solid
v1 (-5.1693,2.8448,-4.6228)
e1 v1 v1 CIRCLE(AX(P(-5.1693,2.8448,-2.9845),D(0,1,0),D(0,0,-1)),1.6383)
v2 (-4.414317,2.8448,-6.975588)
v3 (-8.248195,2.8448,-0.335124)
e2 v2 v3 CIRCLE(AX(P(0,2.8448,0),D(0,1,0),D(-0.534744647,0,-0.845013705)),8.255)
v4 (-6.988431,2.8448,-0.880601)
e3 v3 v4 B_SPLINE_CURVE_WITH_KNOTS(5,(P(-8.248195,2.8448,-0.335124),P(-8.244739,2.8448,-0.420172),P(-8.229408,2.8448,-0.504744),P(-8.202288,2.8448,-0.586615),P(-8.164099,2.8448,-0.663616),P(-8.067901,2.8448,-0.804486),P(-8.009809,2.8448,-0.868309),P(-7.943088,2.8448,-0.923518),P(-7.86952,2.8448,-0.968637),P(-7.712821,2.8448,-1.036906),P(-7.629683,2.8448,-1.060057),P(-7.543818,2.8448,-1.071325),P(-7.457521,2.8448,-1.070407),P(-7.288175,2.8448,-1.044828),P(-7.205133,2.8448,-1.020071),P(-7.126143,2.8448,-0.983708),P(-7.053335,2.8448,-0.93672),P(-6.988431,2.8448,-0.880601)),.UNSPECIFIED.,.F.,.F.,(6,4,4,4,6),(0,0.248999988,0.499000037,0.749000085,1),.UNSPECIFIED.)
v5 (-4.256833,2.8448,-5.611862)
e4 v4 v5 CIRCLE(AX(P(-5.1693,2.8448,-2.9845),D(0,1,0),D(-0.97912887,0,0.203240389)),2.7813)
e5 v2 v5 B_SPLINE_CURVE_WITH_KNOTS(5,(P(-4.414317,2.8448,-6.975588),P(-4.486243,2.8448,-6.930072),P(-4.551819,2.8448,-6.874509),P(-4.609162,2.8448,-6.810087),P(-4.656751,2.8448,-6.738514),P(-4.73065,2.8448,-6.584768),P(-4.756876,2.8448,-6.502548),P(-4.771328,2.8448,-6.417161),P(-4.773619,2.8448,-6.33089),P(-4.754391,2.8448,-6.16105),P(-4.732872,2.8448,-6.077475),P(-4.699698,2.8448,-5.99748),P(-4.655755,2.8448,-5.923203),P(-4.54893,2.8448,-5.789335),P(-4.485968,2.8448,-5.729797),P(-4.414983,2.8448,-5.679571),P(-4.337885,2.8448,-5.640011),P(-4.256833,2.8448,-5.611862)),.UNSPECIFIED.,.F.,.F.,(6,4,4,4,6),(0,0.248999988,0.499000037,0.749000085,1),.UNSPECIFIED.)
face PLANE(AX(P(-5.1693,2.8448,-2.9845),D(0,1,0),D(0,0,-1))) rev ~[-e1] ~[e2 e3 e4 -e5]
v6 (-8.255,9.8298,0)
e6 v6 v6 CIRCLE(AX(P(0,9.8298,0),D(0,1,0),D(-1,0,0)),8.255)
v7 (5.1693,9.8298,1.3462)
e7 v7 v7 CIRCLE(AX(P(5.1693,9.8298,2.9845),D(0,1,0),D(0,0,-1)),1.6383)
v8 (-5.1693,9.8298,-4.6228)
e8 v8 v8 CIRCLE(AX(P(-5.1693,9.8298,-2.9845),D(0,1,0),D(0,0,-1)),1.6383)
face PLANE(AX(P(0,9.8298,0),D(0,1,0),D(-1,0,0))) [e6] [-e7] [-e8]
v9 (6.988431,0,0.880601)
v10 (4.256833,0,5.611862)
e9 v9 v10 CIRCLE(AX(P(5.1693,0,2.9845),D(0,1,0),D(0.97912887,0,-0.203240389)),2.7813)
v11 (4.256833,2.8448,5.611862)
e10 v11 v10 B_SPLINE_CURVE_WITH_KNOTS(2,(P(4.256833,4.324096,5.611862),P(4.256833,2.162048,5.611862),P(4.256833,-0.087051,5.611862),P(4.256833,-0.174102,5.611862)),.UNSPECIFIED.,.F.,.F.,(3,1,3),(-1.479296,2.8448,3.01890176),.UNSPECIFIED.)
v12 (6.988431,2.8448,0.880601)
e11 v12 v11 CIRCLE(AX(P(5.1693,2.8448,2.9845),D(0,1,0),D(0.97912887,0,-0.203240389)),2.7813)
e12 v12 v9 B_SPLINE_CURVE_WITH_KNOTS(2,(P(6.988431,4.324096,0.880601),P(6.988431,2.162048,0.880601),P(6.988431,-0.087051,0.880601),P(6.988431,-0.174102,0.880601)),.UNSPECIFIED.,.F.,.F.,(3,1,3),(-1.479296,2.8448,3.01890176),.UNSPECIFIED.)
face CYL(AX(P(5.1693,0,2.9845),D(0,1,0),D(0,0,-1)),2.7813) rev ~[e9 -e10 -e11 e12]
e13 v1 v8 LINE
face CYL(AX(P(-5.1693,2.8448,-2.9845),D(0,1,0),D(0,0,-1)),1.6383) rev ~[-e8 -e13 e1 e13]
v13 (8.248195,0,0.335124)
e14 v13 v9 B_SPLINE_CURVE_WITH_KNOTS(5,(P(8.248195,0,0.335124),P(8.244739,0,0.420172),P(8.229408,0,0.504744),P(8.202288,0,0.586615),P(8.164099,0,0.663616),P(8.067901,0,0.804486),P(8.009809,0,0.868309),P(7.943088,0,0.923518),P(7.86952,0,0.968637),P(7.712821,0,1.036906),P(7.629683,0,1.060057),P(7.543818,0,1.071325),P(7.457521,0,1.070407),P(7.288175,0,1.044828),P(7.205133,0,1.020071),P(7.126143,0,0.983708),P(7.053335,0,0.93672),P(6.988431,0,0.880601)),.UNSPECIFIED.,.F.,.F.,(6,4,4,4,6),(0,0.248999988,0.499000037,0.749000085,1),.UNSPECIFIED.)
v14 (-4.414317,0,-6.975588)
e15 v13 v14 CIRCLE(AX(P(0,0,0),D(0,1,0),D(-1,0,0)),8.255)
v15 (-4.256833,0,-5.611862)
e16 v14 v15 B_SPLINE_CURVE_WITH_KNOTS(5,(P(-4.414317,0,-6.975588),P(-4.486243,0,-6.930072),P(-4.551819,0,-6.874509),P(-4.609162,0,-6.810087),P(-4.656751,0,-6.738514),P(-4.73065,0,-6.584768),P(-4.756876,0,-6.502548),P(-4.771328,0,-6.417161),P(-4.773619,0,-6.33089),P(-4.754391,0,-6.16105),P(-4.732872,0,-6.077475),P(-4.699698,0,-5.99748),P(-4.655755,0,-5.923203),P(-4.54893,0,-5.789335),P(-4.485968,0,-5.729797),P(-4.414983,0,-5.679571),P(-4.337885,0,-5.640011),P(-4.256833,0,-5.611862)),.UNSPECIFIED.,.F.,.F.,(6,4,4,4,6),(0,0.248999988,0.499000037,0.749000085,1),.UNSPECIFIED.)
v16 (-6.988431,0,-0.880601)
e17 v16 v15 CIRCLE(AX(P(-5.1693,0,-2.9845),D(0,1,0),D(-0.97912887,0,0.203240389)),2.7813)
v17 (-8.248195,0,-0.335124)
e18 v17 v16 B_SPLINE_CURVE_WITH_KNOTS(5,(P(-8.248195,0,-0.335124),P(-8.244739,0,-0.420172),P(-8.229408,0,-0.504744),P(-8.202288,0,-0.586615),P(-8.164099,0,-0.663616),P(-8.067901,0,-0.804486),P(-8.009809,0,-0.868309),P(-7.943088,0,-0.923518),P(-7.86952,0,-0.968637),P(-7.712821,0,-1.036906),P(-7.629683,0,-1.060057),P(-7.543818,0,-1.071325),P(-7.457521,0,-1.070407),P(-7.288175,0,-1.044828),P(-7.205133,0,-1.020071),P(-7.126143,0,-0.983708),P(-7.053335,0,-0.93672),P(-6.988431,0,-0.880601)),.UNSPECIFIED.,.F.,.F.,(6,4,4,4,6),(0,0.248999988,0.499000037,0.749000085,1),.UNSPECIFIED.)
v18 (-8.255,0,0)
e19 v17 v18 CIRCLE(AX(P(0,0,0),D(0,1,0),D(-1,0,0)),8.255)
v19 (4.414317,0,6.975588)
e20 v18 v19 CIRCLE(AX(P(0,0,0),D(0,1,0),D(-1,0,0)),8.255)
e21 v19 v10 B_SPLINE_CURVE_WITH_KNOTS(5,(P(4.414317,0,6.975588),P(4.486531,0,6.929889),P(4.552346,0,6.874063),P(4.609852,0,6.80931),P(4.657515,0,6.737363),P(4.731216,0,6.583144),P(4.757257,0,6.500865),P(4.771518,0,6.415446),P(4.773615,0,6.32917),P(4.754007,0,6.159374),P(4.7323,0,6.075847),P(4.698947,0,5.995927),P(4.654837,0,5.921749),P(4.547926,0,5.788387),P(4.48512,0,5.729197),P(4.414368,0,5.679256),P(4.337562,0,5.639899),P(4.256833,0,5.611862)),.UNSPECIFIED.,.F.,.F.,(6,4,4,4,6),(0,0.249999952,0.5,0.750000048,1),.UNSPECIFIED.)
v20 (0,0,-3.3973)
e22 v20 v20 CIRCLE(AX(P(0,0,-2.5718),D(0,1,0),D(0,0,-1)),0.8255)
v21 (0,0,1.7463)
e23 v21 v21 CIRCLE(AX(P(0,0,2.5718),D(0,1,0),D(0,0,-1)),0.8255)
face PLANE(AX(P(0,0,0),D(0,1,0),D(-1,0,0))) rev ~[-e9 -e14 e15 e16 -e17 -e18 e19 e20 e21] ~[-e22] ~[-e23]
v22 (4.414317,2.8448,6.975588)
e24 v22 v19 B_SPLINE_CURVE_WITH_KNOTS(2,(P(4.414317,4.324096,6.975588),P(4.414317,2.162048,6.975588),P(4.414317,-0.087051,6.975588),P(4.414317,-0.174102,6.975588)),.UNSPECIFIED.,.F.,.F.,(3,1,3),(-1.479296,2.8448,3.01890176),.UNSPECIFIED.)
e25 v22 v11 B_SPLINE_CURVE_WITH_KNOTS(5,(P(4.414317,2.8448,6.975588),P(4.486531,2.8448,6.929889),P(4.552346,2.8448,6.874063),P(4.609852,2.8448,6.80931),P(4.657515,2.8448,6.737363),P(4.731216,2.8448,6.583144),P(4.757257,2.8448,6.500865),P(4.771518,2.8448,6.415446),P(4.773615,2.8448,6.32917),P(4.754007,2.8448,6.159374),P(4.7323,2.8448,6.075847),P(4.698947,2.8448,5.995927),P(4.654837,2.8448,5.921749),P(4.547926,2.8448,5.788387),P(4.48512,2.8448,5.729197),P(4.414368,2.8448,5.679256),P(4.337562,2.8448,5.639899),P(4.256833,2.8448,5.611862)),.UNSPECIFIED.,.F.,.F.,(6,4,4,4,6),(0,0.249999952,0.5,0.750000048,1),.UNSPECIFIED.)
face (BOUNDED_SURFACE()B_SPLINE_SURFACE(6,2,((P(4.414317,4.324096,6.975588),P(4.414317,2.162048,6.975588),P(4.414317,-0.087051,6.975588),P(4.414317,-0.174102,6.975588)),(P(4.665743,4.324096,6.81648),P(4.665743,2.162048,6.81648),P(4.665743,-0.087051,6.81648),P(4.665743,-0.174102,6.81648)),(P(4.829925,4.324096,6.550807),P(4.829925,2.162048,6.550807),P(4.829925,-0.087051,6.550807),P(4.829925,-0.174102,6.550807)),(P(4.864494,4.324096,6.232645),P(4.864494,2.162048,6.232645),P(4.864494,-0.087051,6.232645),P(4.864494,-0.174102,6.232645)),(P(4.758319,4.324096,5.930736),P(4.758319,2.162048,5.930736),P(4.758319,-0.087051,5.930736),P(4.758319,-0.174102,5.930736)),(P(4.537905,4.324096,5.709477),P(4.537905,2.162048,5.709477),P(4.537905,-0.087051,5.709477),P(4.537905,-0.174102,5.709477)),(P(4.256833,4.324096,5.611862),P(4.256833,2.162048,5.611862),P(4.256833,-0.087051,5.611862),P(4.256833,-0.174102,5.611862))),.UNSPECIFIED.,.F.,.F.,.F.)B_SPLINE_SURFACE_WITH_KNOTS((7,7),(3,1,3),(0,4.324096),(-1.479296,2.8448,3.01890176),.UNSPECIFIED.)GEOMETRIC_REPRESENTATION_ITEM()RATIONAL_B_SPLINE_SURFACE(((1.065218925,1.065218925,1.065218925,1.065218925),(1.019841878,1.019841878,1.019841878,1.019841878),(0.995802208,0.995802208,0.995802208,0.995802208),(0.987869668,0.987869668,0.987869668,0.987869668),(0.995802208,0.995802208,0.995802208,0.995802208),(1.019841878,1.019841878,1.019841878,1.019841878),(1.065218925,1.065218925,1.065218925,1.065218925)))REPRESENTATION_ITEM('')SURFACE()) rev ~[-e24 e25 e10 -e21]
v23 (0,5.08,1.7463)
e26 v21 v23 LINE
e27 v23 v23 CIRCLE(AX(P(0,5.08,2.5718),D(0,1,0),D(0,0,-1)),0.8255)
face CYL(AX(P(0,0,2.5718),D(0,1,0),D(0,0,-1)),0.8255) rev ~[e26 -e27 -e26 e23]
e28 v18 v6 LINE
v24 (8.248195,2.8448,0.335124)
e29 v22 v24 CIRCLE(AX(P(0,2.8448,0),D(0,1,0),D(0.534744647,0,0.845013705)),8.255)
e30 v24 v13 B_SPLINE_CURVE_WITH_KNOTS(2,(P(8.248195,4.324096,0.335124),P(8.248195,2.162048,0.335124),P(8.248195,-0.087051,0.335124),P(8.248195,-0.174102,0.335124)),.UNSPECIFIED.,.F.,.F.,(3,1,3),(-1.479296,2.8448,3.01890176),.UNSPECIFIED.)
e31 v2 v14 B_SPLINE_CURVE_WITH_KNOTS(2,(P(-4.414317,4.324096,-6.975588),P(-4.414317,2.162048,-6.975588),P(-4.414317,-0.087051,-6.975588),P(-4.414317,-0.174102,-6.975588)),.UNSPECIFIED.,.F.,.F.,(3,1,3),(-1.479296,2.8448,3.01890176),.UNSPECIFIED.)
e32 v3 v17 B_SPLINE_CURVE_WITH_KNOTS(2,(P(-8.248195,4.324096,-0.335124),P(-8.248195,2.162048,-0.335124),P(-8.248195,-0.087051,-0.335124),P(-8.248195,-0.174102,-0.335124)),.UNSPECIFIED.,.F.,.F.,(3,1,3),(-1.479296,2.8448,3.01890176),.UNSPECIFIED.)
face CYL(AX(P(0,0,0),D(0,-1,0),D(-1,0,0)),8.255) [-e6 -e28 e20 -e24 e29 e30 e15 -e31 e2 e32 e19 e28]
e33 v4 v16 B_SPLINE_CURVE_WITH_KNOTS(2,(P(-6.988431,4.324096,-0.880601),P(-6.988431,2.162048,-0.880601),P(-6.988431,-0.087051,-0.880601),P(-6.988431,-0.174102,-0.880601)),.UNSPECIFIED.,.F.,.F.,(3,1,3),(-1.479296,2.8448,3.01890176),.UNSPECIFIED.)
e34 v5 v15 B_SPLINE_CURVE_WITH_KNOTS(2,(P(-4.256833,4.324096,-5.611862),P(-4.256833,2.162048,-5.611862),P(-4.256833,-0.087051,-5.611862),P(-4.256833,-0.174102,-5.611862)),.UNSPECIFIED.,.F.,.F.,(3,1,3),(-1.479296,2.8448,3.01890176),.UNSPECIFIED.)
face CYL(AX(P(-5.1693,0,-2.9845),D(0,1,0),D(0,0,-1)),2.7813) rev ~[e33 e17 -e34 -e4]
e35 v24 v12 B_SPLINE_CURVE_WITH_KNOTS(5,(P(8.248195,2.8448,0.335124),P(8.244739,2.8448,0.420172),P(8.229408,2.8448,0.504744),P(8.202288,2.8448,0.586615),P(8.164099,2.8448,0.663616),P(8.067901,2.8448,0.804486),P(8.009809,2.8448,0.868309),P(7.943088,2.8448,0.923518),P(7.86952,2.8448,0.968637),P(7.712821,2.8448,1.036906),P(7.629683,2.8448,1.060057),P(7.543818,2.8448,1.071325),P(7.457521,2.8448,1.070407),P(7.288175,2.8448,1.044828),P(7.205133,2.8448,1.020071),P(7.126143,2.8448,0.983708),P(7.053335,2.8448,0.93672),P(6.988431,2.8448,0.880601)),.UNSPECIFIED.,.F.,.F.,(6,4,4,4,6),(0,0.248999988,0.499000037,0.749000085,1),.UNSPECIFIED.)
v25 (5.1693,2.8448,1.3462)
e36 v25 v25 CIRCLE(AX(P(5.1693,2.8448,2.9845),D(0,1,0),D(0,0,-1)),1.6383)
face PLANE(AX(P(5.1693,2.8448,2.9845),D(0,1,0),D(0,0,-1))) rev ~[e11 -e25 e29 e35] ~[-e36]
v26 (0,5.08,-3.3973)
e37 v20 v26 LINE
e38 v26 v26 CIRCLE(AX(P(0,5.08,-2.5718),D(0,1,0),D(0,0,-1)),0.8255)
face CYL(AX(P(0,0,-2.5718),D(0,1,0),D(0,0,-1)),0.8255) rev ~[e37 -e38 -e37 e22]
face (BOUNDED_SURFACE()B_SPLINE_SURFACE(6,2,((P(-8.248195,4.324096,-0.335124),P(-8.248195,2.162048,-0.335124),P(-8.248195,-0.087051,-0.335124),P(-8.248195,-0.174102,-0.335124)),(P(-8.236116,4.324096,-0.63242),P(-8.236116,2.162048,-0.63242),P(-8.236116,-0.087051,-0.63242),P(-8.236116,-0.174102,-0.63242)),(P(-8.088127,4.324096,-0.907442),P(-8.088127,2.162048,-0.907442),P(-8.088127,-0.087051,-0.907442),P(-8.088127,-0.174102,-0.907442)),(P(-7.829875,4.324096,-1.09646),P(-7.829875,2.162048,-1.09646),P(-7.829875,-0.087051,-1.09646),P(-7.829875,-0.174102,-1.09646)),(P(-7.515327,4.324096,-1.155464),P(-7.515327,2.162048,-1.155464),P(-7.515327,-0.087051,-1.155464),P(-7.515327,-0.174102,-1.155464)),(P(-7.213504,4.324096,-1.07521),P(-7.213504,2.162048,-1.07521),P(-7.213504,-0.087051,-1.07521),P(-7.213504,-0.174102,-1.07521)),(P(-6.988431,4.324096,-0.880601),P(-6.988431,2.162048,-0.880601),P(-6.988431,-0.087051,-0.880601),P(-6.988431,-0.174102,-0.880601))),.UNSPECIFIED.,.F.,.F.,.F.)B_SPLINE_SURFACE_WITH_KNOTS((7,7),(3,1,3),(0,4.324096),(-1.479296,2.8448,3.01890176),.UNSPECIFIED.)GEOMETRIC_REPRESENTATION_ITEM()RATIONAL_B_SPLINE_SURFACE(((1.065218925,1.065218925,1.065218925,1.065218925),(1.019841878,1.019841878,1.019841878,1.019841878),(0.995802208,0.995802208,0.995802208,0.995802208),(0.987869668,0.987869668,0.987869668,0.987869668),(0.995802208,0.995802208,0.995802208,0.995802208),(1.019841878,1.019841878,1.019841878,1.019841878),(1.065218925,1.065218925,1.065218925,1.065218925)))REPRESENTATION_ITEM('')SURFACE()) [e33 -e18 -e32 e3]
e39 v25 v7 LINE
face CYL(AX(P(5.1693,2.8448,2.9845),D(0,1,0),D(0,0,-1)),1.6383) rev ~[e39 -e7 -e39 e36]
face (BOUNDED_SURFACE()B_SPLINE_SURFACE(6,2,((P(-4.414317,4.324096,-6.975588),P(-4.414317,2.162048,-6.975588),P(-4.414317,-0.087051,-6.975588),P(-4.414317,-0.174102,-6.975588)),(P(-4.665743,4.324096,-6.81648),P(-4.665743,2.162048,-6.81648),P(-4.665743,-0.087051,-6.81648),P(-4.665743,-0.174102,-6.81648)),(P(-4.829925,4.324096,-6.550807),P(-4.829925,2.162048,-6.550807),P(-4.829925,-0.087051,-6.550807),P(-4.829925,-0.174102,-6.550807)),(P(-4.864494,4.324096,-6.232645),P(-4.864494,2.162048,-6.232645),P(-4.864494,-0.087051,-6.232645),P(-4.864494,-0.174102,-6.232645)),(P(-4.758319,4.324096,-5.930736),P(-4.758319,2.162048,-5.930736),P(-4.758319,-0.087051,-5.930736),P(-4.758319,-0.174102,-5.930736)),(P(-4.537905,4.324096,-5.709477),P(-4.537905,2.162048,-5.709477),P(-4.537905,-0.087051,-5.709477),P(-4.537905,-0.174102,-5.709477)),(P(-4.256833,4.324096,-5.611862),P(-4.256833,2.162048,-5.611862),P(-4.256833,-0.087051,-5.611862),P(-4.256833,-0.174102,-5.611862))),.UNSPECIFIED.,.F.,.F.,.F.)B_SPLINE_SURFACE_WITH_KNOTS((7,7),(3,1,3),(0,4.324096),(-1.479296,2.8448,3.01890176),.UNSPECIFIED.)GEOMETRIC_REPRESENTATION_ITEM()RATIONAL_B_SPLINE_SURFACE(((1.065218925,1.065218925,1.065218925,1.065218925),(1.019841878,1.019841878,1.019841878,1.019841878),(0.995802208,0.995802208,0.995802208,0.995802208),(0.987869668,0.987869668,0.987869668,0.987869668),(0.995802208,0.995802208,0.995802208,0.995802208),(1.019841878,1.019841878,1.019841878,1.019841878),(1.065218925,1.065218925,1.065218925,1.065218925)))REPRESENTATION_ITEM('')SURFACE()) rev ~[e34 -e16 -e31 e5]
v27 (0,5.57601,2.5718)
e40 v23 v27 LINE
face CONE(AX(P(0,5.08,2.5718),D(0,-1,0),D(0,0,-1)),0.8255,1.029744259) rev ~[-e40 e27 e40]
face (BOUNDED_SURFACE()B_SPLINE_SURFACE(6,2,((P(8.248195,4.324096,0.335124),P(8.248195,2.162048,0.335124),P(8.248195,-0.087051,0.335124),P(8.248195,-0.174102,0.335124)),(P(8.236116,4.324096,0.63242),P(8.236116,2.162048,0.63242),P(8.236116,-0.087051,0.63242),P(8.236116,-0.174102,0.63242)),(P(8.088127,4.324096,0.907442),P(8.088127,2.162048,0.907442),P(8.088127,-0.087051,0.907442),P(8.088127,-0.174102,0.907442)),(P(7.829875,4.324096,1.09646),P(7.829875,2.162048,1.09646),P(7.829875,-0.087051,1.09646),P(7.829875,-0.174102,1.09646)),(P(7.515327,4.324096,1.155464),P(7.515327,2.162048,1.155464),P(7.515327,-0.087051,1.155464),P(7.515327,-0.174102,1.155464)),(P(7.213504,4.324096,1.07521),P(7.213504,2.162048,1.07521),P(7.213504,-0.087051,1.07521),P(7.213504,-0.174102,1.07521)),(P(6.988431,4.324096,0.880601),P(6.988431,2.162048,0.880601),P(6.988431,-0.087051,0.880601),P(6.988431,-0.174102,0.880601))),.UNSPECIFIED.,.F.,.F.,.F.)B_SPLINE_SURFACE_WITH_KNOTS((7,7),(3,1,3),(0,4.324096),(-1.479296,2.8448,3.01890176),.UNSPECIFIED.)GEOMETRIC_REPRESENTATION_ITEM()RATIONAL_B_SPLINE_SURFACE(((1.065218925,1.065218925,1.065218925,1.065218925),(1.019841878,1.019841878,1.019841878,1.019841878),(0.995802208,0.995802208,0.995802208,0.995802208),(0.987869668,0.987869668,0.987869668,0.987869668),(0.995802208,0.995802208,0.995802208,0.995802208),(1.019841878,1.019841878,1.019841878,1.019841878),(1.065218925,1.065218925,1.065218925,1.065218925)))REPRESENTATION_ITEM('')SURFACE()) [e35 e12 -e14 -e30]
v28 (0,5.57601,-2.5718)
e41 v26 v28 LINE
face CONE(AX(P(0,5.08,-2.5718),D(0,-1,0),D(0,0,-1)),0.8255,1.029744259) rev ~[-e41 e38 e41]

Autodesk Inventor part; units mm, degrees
ref_plane "YZ Plane" through (0, 0, 0) normal (1, 0, 0) x (0, 1, 0)
ref_plane "XZ Plane" through (0, 0, 0) normal (0, 1, 0) x (-1, 0, 0)
ref_plane "XY Plane" through (0, 0, 0) normal (0, 0, 1) x (1, 0, 0)
sketch "Sketch1" plane through (0, 0, 0) normal (0, 1, 0) x (-1, 0, 0)
  circle A0 centre (0, 0) radius 8.255
  dimension "d0" = 16.51
extrude "Extrusion1" add sketch "Sketch1" along normal blind 9.8298
sketch "Sketch2" plane through (0, 0, 0) normal (0, -1, 0) x (1, 0, 0)
  line L0 (-5.1693, -2.9845) -> (5.1693, 2.9845) construction
  line L1 (-11.557, 0) -> (11.557, 0) projected
  point P0 (0, 0)
  dimension "d3" = 11.938
  dimension "d4" = 5.969
  dimension "d5" = 30
hole "Hole1" at (-5.1693, 0, -2.9845) at (5.1693, 0, 2.9845) direction (0, 1, 0) diameter 3.2766 end through all counterbore diameter 5.5626 counterbore depth 2.8448 clearance for "Socket Head Cap Screw" size "#4" standard "Ansi Unified Screw Threads"
fillet "Fillet1" radius 0.762 4 edges at (6.0414, 1.4224, 5.6255) (7.8926, 1.4224, 2.4192) (-6.0414, 1.4224, -5.6255) (-7.8926, 1.4224, -2.4192)
sketch "Sketch3" plane through (0, 0, 0) normal (0, -1, 0) x (1, 0, 0)
  point P0 (0, 0)
  point P1 (0, 2.5718)
  point P2 (0, -2.5718)
  dimension "d14" = 5.1435
  dimension "d15" = 2.5718
hole "Hole2" at (0, 0, 2.5718) at (0, 0, -2.5718) direction (0, 1, 0) diameter 1.651 depth 5.08 tip angle 118
equation "\"d4\" = 0.5 * d3"
equation "\"d15\" = 0.5 * d14"
properties part number "06WX5378 / 25.105.3101.00"
